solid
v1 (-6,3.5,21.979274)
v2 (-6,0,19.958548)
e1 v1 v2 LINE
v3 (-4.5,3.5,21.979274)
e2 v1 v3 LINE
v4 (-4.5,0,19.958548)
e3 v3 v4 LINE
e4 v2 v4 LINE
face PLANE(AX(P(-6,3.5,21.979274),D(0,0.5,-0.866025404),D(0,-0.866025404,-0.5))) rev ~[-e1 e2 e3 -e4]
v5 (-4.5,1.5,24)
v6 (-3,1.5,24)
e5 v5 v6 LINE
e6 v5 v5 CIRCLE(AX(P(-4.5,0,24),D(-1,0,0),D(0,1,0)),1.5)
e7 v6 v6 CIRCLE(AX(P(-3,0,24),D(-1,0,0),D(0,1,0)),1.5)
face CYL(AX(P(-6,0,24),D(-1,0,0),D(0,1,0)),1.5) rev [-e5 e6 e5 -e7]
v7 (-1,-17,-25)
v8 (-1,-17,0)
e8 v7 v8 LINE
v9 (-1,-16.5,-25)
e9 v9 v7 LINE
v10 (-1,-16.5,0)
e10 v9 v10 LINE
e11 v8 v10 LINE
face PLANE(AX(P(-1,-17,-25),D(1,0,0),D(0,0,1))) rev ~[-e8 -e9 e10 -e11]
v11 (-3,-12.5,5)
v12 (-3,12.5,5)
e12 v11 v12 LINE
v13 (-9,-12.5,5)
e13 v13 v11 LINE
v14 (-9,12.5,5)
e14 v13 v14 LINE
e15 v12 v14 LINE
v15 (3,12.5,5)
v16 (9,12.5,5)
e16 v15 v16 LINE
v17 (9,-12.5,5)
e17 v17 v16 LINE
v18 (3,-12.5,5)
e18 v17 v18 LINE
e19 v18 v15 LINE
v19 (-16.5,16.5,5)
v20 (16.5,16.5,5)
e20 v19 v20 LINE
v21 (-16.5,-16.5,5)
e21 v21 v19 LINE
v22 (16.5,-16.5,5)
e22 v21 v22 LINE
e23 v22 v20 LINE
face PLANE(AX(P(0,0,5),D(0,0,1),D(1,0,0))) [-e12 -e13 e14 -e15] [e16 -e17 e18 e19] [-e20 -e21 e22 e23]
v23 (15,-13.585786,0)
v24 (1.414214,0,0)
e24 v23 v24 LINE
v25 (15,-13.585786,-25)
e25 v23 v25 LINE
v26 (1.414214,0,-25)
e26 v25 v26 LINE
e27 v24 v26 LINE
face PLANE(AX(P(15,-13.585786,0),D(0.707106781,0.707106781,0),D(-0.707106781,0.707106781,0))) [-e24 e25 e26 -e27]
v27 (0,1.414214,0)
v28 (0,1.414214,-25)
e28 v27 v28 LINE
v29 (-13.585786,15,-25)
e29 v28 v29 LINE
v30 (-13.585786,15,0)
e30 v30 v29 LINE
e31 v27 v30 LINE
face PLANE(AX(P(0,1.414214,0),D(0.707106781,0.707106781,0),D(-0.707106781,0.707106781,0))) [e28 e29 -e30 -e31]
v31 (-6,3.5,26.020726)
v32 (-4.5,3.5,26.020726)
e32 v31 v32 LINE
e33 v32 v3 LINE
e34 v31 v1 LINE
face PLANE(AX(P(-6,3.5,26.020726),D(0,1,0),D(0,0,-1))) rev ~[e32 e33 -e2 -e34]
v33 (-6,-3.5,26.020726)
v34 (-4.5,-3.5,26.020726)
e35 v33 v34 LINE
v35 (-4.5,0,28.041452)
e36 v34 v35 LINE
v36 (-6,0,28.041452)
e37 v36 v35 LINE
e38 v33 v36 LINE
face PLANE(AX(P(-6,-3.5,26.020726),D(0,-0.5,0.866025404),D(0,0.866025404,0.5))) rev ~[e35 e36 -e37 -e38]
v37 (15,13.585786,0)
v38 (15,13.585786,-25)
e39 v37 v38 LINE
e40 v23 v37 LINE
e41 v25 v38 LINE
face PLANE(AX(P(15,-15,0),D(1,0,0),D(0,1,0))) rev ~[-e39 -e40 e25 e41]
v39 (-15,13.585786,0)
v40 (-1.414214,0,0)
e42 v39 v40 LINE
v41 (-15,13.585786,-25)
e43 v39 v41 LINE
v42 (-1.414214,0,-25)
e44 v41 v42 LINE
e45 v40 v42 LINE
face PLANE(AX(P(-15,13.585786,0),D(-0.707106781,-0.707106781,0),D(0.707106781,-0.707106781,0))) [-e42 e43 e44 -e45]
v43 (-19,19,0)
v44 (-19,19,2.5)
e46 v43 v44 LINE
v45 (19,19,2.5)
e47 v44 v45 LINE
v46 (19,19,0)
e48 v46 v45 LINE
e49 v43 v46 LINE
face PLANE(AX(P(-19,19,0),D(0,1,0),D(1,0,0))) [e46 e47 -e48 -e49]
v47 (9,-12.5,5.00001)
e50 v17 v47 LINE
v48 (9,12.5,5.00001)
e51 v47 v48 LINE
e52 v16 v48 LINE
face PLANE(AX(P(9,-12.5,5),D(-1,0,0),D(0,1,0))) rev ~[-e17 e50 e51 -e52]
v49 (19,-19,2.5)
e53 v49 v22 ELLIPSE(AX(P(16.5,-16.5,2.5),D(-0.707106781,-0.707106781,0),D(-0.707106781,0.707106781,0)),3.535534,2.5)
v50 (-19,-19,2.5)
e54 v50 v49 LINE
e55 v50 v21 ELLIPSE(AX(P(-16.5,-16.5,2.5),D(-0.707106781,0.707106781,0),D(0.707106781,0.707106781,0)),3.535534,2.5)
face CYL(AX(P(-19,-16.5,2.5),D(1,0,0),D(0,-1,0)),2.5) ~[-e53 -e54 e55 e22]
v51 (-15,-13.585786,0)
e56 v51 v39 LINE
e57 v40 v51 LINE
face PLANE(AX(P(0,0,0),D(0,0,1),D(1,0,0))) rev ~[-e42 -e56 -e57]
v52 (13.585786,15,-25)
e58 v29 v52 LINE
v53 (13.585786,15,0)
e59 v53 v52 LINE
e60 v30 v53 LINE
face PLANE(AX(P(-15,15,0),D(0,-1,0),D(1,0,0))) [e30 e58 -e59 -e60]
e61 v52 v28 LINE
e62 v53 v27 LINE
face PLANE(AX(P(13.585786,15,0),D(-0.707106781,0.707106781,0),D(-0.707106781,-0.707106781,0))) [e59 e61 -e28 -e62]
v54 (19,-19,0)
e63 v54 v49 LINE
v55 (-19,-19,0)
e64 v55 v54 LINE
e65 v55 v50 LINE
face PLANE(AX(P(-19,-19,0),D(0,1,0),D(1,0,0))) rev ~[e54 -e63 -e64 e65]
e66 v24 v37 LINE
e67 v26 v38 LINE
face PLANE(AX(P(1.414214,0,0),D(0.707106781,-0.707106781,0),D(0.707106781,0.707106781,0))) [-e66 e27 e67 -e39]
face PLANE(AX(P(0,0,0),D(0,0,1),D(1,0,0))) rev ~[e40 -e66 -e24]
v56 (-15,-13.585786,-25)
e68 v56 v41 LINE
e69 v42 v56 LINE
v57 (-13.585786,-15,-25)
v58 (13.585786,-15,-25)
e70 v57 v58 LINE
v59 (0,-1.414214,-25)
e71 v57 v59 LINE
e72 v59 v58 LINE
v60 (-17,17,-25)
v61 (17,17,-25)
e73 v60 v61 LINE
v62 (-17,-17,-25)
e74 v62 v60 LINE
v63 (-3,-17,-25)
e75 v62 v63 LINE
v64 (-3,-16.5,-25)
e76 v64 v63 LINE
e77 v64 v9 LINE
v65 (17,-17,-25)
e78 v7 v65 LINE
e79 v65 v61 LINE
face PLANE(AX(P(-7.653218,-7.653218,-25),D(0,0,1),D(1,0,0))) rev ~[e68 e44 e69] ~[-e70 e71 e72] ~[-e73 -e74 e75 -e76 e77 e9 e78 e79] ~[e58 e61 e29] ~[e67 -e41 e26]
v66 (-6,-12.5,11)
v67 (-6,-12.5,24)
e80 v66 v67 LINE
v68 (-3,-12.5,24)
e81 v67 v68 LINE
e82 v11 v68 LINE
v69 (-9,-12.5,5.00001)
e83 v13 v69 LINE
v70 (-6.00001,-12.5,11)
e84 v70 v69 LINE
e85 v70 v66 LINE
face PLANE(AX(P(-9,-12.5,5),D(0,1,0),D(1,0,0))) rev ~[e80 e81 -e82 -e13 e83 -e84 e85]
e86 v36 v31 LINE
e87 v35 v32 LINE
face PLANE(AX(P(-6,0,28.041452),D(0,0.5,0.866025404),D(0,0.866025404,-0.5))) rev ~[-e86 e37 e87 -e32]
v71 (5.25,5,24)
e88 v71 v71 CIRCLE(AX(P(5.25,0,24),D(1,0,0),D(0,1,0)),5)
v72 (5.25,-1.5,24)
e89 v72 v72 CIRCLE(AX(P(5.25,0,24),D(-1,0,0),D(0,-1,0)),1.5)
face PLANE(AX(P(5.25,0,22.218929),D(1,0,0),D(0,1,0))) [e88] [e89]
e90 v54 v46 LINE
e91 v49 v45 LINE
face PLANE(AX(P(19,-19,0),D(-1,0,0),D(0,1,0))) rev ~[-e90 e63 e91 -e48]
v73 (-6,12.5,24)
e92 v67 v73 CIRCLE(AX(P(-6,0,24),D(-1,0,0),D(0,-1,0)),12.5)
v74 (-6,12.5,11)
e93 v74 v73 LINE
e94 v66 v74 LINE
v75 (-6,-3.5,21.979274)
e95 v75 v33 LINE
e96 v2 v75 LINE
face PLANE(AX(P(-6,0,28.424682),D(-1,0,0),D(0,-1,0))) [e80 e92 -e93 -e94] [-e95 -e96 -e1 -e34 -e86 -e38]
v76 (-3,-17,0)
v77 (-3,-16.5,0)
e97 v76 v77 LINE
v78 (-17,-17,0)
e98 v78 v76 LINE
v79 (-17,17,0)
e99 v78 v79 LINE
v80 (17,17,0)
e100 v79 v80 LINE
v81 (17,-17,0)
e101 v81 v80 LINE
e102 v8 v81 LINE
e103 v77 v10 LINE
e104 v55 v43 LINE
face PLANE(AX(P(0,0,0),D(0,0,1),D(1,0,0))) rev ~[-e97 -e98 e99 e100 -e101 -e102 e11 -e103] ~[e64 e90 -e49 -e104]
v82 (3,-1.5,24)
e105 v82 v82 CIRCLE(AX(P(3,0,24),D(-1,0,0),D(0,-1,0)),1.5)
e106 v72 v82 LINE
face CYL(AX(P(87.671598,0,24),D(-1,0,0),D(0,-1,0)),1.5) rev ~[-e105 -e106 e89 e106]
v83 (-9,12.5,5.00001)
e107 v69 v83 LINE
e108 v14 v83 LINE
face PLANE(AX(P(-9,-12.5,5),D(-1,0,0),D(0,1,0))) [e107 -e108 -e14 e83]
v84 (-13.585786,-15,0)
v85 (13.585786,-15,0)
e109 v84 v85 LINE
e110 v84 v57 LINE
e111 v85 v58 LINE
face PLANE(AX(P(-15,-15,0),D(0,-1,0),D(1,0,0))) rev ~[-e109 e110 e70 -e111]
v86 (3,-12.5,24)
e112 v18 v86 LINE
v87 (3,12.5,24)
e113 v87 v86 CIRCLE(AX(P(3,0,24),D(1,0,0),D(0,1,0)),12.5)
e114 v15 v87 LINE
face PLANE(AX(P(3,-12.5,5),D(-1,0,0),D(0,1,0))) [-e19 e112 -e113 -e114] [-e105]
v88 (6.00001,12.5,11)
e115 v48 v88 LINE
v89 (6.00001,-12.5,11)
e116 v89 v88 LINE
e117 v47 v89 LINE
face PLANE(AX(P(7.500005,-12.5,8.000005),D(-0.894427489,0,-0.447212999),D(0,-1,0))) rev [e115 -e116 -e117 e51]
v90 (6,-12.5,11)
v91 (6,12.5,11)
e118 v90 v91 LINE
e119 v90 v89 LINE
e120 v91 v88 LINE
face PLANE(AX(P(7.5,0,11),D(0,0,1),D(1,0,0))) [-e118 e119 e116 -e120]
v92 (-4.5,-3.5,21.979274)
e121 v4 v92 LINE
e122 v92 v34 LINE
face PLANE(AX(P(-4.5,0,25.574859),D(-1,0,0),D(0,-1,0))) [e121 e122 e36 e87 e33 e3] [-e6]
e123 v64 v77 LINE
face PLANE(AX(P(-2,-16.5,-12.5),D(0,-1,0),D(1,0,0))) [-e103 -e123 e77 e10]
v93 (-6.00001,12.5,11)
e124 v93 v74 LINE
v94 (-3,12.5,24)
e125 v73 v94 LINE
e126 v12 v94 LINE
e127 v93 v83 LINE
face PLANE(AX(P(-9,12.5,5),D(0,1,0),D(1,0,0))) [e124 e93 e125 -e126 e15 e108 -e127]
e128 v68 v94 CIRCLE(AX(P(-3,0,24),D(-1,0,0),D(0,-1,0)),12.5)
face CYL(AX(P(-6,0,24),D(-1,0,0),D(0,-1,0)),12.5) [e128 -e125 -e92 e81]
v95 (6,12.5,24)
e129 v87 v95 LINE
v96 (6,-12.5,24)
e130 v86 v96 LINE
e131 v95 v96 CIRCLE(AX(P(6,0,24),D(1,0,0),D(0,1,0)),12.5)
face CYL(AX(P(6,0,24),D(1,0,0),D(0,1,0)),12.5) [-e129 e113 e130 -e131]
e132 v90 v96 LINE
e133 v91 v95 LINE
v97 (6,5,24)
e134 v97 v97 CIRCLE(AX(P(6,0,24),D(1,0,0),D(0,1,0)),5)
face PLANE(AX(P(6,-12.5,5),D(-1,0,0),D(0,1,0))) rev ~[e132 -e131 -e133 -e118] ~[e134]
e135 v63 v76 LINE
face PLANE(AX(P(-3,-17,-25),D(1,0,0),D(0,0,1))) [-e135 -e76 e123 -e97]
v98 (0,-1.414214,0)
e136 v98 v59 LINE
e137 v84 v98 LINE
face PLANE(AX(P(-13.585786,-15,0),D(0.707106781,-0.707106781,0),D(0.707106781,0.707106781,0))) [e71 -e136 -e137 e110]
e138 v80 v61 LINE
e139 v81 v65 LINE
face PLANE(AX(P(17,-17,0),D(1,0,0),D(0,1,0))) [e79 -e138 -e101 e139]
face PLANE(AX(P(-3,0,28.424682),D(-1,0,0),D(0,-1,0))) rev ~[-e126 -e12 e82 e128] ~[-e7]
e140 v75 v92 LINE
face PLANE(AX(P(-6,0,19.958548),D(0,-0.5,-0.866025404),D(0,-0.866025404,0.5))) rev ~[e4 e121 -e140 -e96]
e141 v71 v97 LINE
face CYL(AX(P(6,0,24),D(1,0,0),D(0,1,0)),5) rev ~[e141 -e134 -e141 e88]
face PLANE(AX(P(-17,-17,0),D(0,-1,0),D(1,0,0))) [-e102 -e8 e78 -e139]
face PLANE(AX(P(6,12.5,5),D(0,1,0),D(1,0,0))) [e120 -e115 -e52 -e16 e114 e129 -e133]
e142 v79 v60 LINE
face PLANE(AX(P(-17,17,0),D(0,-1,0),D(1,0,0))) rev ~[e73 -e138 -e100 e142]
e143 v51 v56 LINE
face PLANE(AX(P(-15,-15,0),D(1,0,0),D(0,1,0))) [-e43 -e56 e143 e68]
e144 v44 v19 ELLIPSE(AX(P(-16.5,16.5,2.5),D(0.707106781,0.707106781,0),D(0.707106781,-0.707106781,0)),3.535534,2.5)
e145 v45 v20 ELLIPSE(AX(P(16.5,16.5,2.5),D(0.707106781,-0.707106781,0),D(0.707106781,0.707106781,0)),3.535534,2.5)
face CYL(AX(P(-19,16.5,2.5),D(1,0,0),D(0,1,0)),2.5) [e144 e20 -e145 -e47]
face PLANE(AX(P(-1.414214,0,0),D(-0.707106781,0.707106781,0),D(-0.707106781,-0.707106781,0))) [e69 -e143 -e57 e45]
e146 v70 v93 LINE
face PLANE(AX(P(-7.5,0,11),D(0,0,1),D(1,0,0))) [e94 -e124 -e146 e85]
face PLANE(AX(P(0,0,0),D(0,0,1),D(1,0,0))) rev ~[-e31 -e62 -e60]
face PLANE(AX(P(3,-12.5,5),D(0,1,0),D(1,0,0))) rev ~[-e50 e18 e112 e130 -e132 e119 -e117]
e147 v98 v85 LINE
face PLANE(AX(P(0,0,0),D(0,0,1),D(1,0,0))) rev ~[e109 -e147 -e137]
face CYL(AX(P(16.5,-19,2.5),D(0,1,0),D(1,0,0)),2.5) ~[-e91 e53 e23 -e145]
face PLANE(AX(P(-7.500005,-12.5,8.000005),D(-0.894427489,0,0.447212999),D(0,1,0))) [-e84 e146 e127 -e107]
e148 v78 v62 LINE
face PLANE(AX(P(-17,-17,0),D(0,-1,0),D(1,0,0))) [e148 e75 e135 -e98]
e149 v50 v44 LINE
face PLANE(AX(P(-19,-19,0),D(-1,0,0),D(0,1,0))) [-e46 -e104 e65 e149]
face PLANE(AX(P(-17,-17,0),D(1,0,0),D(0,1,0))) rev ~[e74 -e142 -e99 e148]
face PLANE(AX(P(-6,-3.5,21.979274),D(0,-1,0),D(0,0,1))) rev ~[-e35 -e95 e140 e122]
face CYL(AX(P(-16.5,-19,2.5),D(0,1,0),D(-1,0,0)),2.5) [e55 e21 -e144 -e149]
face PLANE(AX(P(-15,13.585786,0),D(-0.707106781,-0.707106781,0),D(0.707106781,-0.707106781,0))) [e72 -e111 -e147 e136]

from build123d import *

# Parameters (mm, degrees)
F0_W      = 38
F0_H      = 38
F0_W_2    = 34
F0_H_2    = 34
F0_W_3    = 30
F0_H_3    = 30
F1_DEPTH  = 5
F2_DEPTH  = 25
F4_DEPTH  = 25
F5_DEPTH  = 25
F6_R      = 2.5
F7_W      = 3
F7_H      = 25
F8_DEPTH  = 19
F9_DEPTH  = 19
F10_DEPTH = 6
F11_SIZE2 = 5.99999
F11_SIZE  = 2.99999
F12_SIZE2 = 2.99999
F12_SIZE  = 5.99999
F14_DEPTH = 3
F16_DEPTH = 3
F17_D     = 3
F18_DEPTH = 0.75
F19_DEPTH = 3
F20_DEPTH = 1.5
F21_W     = 2
F21_H     = 25
F22_DEPTH = 0.5


# Not quite as in the source:
# - a fillet or chamfer is up to 0.001 mm smaller than in the source, because OpenCascade refuses the exact size
# - a feature names something its author has since deleted; it is built from what else it names


with BuildPart() as f1:
    # F0 (on Top) → F1 (new body)
    with BuildSketch(Plane.XY):
        Rectangle(F0_W, F0_H)
        Rectangle(F0_W_2, F0_H_2, mode=Mode.SUBTRACT)
        Rectangle(F0_W_2, F0_H_2)
        Rectangle(F0_W_3, F0_H_3, mode=Mode.SUBTRACT)
        Rectangle(F0_W_3, F0_H_3)
    extrude(amount=F1_DEPTH)

    # F0 (on Top) → F2 (join)
    with BuildSketch(Plane.XY):
        Rectangle(F0_W_2, F0_H_2)
        Rectangle(F0_W_3, F0_H_3, mode=Mode.SUBTRACT)
    extrude(amount=-F2_DEPTH)

    # F3 (on face) → F4 (join)
    with BuildSketch(Plane.XY):
        Polygon((1.4142135624, 0), (0.7071067812, 0.7071067812), (0, 1.4142135624), (-13.5857864376, 15), (-15, 15), (-15, 13.5857864376), (-1.4142135624, 0), (-0.7071067812, -0.7071067812), (0, -1.4142135624), (13.5857864376, -15), (15, -15), (15, -13.5857864376), align=None)
        Polygon((0, 1.4142135624), (0.7071067812, 0.7071067812), (1.4142135624, 0), (15, 13.5857864376), (15, 15), (13.5857864376, 15), align=None)
    extrude(amount=-F4_DEPTH)

    # F3 (on face) → F5 (join)
    with BuildSketch(Plane.XY):
        Polygon((-0.7071067812, -0.7071067812), (-1.4142135624, 0), (-15, -13.5857864376), (-15, -15), (-13.5857864376, -15), (0, -1.4142135624), align=None)
    extrude(amount=-F5_DEPTH)

    # F6
    f6_edges = [f1.edges().sort_by_distance(p)[0] for p in [
        (0, 19, 5),
        (19, 0, 5),
        (-19, 0, 5),
        (0, -19, 5),
    ]]
    fillet(f6_edges, radius=F6_R)

    # F7 (on face) → F8 (join)
    with BuildSketch(Plane.XY.offset(5)):
        with Locations((-4.5, 0)):
            Rectangle(F7_W, F7_H)
    extrude(amount=F8_DEPTH)

    # F7 (on face) → F9 (join)
    with BuildSketch(Plane.XY.offset(5)):
        with Locations((4.5, 0)):
            Rectangle(F7_W, F7_H)
    extrude(amount=F9_DEPTH)

    # F7 (on face) → F10 (join)
    with BuildSketch(Plane.XY.offset(5)):
        with Locations((-7.5, 0)):
            Rectangle(F7_W, F7_H)
        with Locations((7.5, 0)):
            Rectangle(F7_W, F7_H)
    extrude(amount=F10_DEPTH)

    # F11 (size 3 and 6 in the source; OpenCascade refuses exactly that, so slightly less here)
    f11_edges = [f1.edges().sort_by_distance(p)[0] for p in [
        (-9, 0, 11),
    ]]
    f11_side = f1.faces().sort_by_distance((-7.5, 0, 11))[0]
    chamfer(f11_edges, length=F11_SIZE, length2=F11_SIZE2, reference=f11_side)

    # F12 (size 6 and 3 in the source; OpenCascade refuses exactly that, so slightly less here)
    f12_edges = [f1.edges().sort_by_distance(p)[0] for p in [
        (9, 0, 11),
    ]]
    f12_side = f1.faces().sort_by_distance((9, 0, 8))[0]
    chamfer(f12_edges, length=F12_SIZE, length2=F12_SIZE2, reference=f12_side)

    # F13 (on face) → F14 (join)
    with BuildSketch(Plane.YZ.offset(6)):
        with BuildLine():
            ThreePointArc((-12.5, 24), (0, 11.5), (12.5, 24))
            Line((12.5, 24), (5, 24))
            ThreePointArc((5, 24), (0, 19), (-5, 24))
            Line((-5, 24), (-12.5, 24))
        make_face()
        with BuildLine():
            Line((5, 24), (12.5, 24))
            ThreePointArc((12.5, 24), (0, 36.5), (-12.5, 24))
            Line((-12.5, 24), (-5, 24))
            ThreePointArc((-5, 24), (0, 29), (5, 24))
        make_face()
        with BuildLine():
            Line((1.5, 24), (5, 24))
            ThreePointArc((5, 24), (0, 29), (-5, 24))
            Line((-5, 24), (-1.5, 24))
            ThreePointArc((-1.5, 24), (0, 25.5), (1.5, 24))
        make_face()
        with BuildLine():
            Line((-1.5, 24), (1.5, 24))
            ThreePointArc((1.5, 24), (0, 25.5), (-1.5, 24))
        make_face()
    extrude(amount=-F14_DEPTH)

    # F15 (on face) → F16 (join)
    with BuildSketch(Plane(origin=(-6, 0, 0), x_dir=(0, -1, 0), z_dir=(-1, 0, 0))):
        with BuildLine():
            Line((-1.5, 24), (1.5, 24))
            ThreePointArc((1.5, 24), (0, 25.5), (-1.5, 24))
        make_face()
    extrude(amount=-F16_DEPTH)

    # F17 (through all)
    with Locations(Plane.YZ.offset(6)):
        with Locations((0, 24)):
            Hole(F17_D / 2)

    # F13 (on face) → F18 (cut, symmetric)
    with BuildSketch(Plane.YZ.offset(6)):
        with BuildLine():
            ThreePointArc((-5, 24), (0, 19), (5, 24))
            Line((5, 24), (1.5, 24))
            ThreePointArc((1.5, 24), (0, 22.5), (-1.5, 24))
            Line((-1.5, 24), (-5, 24))
        make_face()
        with BuildLine():
            Line((1.5, 24), (5, 24))
            ThreePointArc((5, 24), (0, 29), (-5, 24))
            Line((-5, 24), (-1.5, 24))
            ThreePointArc((-1.5, 24), (0, 25.5), (1.5, 24))
        make_face()
    extrude(amount=F18_DEPTH, both=True, mode=Mode.SUBTRACT)

    # F15 (on face) → F19 (join)
    with BuildSketch(Plane(origin=(-6, 0, 0), x_dir=(0, -1, 0), z_dir=(-1, 0, 0))):
        with BuildLine():
            Line((3.5, 24), (12.5, 24))
            ThreePointArc((12.5, 24), (0, 36.5), (-12.5, 24))
            Line((-12.5, 24), (-3.5, 24))
            Line((-3.5, 24), (-3.5, 26.0207259422))
            Line((-3.5, 26.0207259422), (0, 28.0414518843))
            Line((0, 28.0414518843), (3.5, 26.0207259422))
            Line((3.5, 26.0207259422), (3.5, 24))
        make_face()
        with BuildLine():
            Line((1.5, 24), (3.5, 24))
            Line((3.5, 24), (3.5, 26.0207259422))
            Line((3.5, 26.0207259422), (0, 28.0414518843))
            Line((0, 28.0414518843), (-3.5, 26.0207259422))
            Line((-3.5, 26.0207259422), (-3.5, 24))
            Line((-3.5, 24), (-1.5, 24))
            ThreePointArc((-1.5, 24), (0, 25.5), (1.5, 24))
        make_face()
    extrude(amount=-F19_DEPTH)

    # F15 (on face) → F20 (cut)
    with BuildSketch(Plane(origin=(-6, 0, 0), x_dir=(0, -1, 0), z_dir=(-1, 0, 0))):
        with BuildLine():
            Line((1.5, 24), (3.5, 24))
            Line((3.5, 24), (3.5, 26.0207259422))
            Line((3.5, 26.0207259422), (0, 28.0414518843))
            Line((0, 28.0414518843), (-3.5, 26.0207259422))
            Line((-3.5, 26.0207259422), (-3.5, 24))
            Line((-3.5, 24), (-1.5, 24))
            ThreePointArc((-1.5, 24), (0, 25.5), (1.5, 24))
        make_face()
        with BuildLine():
            Line((3.5, 21.9792740578), (3.5, 24))
            Line((3.5, 24), (1.5, 24))
            ThreePointArc((1.5, 24), (0, 22.5), (-1.5, 24))
            Line((-1.5, 24), (-3.5, 24))
            Line((-3.5, 24), (-3.5, 21.9792740578))
            Line((-3.5, 21.9792740578), (0, 19.9585481157))
            Line((0, 19.9585481157), (3.5, 21.9792740578))
        make_face()
    extrude(amount=-F20_DEPTH, mode=Mode.SUBTRACT)

    # F21 (on face) → F22 (cut, symmetric)
    with BuildSketch(Plane.XZ.offset(17)):
        with Locations((-2, -12.5)):
            Rectangle(F21_W, F21_H)
    extrude(amount=F22_DEPTH, both=True, mode=Mode.SUBTRACT)


solid = f1.part
